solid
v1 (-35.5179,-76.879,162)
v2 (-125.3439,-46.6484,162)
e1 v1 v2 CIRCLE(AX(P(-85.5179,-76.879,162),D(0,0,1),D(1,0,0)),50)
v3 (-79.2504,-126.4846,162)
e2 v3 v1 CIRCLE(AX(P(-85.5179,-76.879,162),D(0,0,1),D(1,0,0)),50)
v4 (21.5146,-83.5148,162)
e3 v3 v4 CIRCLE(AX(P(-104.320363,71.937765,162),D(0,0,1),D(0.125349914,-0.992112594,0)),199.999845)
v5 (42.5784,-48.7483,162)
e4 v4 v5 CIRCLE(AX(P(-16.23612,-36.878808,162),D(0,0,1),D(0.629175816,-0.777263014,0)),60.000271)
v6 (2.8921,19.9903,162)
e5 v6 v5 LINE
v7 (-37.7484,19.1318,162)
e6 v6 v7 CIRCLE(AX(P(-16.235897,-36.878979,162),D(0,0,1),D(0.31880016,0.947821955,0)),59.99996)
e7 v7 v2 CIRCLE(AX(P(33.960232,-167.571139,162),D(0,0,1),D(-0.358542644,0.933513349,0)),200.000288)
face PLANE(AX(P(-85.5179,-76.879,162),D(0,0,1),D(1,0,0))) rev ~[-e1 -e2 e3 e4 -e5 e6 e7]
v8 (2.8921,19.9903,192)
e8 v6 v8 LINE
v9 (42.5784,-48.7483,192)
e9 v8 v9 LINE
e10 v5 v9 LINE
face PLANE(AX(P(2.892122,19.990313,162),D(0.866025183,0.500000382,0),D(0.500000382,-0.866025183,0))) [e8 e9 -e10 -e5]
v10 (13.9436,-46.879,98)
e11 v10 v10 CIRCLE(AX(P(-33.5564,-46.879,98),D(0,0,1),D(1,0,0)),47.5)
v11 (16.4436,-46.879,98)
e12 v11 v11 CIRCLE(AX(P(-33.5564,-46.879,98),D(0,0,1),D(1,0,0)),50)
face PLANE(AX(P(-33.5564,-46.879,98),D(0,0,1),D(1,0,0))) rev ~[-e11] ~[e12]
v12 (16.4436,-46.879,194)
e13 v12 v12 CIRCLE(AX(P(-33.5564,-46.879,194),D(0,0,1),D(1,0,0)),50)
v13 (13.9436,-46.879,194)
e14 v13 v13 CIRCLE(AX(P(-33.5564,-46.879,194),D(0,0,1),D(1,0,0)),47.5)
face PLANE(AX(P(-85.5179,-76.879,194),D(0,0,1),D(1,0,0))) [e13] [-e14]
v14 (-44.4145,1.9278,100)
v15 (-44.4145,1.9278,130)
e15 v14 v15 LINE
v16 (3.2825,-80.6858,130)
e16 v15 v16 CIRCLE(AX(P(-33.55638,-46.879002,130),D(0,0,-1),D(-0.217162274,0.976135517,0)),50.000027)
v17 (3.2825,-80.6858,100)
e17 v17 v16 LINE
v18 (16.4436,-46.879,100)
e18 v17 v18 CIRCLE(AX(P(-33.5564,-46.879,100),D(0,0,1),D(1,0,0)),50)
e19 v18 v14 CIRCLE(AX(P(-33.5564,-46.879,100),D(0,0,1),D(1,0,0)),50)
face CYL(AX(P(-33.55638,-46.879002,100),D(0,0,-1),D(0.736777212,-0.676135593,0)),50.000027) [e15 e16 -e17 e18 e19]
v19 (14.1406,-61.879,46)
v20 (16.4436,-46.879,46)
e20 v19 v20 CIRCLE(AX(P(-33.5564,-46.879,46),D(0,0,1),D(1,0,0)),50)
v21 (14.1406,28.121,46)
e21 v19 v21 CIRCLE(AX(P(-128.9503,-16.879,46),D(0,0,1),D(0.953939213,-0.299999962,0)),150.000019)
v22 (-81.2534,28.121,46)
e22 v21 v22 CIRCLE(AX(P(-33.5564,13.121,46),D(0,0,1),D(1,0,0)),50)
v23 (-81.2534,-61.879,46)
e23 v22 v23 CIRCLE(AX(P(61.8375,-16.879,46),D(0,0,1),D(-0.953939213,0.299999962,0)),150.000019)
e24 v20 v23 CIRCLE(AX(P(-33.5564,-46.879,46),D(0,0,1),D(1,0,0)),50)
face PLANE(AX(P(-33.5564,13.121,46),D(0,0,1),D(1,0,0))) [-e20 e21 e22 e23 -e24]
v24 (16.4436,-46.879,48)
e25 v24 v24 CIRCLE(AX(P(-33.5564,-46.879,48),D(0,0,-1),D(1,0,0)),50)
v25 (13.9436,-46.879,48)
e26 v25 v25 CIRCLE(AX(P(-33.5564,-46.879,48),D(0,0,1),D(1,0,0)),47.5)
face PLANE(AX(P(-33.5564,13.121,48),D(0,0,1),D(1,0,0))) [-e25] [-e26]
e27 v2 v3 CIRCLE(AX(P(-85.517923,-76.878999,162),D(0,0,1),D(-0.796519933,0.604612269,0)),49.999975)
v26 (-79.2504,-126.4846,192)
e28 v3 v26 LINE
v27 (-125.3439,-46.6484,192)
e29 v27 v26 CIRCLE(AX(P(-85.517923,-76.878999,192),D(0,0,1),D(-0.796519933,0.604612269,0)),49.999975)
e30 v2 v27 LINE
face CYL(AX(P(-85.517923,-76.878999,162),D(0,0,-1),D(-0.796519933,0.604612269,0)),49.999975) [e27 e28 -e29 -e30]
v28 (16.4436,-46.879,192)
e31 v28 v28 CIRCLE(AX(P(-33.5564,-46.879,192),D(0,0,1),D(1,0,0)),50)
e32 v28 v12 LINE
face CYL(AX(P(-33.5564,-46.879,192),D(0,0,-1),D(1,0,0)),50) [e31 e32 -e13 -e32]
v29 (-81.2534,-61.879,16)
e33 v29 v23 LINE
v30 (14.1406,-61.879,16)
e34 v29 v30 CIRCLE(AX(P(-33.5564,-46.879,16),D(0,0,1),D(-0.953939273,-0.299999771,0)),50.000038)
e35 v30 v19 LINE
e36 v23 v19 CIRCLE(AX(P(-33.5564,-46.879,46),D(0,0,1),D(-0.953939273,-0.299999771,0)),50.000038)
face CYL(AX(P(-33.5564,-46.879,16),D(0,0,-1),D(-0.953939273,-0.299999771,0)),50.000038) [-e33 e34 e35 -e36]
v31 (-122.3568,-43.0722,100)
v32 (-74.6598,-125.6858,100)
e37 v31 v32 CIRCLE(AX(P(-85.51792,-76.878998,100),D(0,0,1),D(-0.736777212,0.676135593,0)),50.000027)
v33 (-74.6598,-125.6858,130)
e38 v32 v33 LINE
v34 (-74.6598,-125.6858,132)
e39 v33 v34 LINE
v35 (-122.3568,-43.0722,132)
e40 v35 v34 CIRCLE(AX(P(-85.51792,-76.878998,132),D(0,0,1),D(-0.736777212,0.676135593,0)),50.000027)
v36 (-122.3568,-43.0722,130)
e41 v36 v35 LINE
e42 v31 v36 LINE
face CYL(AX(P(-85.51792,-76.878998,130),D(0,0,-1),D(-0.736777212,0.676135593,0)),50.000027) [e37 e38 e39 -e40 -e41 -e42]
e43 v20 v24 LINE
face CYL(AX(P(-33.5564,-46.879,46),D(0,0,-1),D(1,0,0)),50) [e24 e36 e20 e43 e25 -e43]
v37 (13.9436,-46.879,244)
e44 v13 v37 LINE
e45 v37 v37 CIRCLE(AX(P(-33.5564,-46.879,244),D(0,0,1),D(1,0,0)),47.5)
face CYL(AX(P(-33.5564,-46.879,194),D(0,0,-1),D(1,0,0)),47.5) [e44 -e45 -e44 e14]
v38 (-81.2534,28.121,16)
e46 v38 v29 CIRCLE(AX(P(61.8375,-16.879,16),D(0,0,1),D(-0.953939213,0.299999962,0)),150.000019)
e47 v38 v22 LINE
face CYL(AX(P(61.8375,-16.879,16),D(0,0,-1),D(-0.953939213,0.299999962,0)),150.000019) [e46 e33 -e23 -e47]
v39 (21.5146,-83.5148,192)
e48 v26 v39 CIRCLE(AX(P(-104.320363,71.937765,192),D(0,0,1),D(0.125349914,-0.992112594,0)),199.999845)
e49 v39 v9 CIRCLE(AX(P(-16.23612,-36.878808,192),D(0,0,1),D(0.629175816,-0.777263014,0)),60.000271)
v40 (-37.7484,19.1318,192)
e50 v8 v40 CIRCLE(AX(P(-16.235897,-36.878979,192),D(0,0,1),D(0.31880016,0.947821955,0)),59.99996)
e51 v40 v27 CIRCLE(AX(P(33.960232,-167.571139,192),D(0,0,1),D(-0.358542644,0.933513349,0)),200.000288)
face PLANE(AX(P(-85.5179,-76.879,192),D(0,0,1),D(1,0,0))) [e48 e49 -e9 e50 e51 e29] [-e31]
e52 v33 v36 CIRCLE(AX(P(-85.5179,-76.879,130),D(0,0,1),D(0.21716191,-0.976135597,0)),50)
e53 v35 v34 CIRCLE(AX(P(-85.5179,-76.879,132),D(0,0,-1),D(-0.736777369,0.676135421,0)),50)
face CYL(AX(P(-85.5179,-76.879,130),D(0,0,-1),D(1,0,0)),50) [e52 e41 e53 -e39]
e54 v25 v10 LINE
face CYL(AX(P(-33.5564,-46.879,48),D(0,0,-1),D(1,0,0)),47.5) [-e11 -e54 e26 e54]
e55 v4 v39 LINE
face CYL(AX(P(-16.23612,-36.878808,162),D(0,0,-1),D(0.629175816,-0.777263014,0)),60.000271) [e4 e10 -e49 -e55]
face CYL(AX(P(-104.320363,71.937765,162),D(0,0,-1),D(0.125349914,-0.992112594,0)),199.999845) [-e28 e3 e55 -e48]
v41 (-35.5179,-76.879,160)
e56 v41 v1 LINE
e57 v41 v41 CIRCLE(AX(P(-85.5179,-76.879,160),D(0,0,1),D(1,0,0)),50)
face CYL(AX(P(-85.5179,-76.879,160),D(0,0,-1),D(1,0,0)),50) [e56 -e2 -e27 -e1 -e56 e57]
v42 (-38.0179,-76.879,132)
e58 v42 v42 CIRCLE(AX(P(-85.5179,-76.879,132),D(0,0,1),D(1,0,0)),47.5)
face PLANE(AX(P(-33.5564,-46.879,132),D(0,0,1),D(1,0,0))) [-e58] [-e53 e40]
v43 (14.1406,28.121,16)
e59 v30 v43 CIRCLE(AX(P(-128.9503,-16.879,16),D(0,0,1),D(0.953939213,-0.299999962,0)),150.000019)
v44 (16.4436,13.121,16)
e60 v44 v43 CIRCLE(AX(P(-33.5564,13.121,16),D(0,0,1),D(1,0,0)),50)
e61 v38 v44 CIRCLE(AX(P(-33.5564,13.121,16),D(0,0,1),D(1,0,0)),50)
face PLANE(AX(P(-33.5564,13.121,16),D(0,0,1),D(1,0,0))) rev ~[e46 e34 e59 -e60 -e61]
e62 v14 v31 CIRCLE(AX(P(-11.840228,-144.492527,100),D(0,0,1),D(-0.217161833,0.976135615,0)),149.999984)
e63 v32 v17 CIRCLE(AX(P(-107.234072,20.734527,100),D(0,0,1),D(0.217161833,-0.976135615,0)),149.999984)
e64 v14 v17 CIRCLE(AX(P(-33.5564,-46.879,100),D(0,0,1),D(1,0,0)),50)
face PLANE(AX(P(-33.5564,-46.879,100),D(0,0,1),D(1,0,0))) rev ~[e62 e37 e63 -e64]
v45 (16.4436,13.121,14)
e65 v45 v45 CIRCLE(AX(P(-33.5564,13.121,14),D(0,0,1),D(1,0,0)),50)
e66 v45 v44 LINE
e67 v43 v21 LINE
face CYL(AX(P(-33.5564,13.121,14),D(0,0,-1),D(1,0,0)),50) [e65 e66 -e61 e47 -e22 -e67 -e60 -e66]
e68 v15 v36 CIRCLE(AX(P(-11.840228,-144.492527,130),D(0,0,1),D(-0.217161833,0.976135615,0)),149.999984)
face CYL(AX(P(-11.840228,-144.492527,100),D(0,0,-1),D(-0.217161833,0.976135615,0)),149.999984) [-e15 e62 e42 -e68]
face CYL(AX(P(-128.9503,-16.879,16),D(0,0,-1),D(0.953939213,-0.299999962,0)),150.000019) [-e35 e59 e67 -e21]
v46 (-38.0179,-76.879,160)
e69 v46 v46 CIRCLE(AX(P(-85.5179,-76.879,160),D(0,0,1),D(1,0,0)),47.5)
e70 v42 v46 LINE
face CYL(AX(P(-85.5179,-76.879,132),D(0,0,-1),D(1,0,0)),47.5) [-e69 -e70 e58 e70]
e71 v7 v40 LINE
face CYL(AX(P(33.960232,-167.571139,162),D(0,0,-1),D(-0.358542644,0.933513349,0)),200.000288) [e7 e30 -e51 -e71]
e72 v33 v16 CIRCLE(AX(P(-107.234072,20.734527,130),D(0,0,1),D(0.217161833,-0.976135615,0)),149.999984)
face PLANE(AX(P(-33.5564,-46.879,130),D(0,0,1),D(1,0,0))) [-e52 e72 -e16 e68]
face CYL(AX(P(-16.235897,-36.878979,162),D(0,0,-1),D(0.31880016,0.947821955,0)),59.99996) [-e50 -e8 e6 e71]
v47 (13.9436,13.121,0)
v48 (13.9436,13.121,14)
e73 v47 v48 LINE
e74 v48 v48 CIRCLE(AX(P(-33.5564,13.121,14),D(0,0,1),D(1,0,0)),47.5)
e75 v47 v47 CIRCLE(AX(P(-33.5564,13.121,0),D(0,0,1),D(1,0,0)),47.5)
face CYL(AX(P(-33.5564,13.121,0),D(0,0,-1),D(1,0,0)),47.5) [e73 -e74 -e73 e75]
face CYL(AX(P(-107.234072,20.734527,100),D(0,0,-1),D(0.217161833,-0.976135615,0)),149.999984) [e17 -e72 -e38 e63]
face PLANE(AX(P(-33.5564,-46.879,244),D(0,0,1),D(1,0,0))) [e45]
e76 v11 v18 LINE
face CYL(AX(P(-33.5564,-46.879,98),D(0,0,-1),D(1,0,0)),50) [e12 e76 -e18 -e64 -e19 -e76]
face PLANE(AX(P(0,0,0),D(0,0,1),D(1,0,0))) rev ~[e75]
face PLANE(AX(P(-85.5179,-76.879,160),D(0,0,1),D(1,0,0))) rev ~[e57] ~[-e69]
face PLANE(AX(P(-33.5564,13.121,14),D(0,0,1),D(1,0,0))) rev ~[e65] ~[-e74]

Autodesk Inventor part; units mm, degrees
ref_plane "YZ Plane" through (0, 0, 0) normal (1, 0, 0) x (0, 1, 0)
ref_plane "XZ Plane" through (0, 0, 0) normal (0, 1, 0) x (-1, 0, 0)
ref_plane "XY Plane" through (0, 0, 0) normal (0, 0, 1) x (1, 0, 0)
sketch "Sketch8" plane through (0, 0, 0) normal (0, 0, 1) x (1, 0, 0)
  circle A0 centre (-33.5564, 13.121) radius 47.5
  point P0 (0, 0)
  dimension "d28" = 95
extrude "Extrusion6" add sketch "Sketch8" along normal blind 14
sketch "Sketch9" plane through (-33.5564, 13.121, 14) normal (0, 0, 1) x (1, 0, 0)
  circle A0 centre (0, 0) radius 50
  point P0 (33.5564, -13.121)
  dimension "d31" = 100
extrude "Extrusion7" add sketch "Sketch9" along normal blind 2
sketch "Sketch10" plane through (-33.5564, 13.121, 16) normal (0, 0, 1) x (1, 0, 0)
  circle A0 centre (0, 0) radius 50 projected
  arc A1 (-47.697, -75) -> (47.697, -75) centre (0, -60) ccw
  arc A2 (47.697, 15) -> (-47.697, 15) centre (0, 0) ccw
  line L0 (-61.4591, 15) -> (62.8598, 15) construction
  arc A3 (47.697, -75) -> (47.697, 15) centre (-95.3939, -30) ccw
  line L1 (0, 0) -> (0, -112.0986) construction
  arc A4 (-47.697, 15) -> (-47.697, -75) centre (95.3939, -30) ccw
  point P0 (33.5564, -13.121)
  point P1 (47.697, 15)
  point P2 (-47.697, 15)
  dimension "d34" = 100
  dimension "d35" = 60
  dimension "d37" = 100
  dimension "d38" = 150
extrude "Extrusion8" add sketch "Sketch10" along normal blind 30
sketch "Sketch15" plane through (-33.5564, 13.121, 46) normal (0, 0, 1) x (1, 0, 0)
  circle A0 centre (0, 0) radius 47.5 projected
  circle A1 centre (0, 0) radius 47.5 projected
  line L0 (0, 0) -> (0, -60)
  circle A2 centre (0, -60) radius 50
  point P0 (33.5564, -13.121)
  dimension "d61" = 60
  dimension "d62" = 100
extrude "Extrusion13" add sketch "Sketch15" along normal blind 2 contours A2 L0 A0 | A0 A2 | A0 L0 A2 picked at (-1.9859, -88.9539)
sketch "Sketch16" plane through (-33.5564, -46.879, 48) normal (0, 0, 1) x (1, 0, 0)
  circle A0 centre (0, 0) radius 47.5
  point P0 (33.5564, 46.879)
  dimension "d65" = 95
extrude "Extrusion14" add sketch "Sketch16" along normal blind 50
sketch "Sketch22" plane through (-33.5564, -46.879, 98) normal (0, 0, 1) x (1, 0, 0)
  circle A0 centre (0, 0) radius 50
  point P0 (33.5564, 46.879)
  dimension "d92" = 100
extrude "Extrusion20" add sketch "Sketch22" along normal blind 2
sketch "Sketch23" plane through (-33.5564, -46.879, 100) normal (0, 0, 1) x (1, 0, 0)
  line L0 (0, 0) -> (0, 136.4462) construction
  line L1 (0, 0) -> (-102.7311, -59.3118) construction
  line L2 (0, 0) -> (-51.9615, -30) construction
  arc A0 (-88.8004, 3.8068) -> (-41.1034, -78.8068) centre (-51.9615, -30) ccw
  arc A1 (-10.8581, 48.8068) -> (-88.8004, 3.8068) centre (21.7162, -97.6136) ccw
  arc A2 (-41.1034, -78.8068) -> (36.8389, -33.8068) centre (-73.6777, 67.6136) ccw
  arc A3 (36.8389, -33.8068) -> (-10.8581, 48.8068) centre (0, 0) ccw
  circle A4 centre (0, 0) radius 50 projected
  point P0 (33.5564, 46.879)
  dimension "d95" = 120
  dimension "d96" = 60
  dimension "d101" = 150
extrude "Extrusion21" add sketch "Sketch23" along normal blind 30
sketch "Sketch31" plane through (-33.5564, -46.879, 130) normal (0, 0, 1) x (1, 0, 0)
  arc A0 (-88.8004, 3.8068) -> (-41.1034, -78.8068) centre (-51.9615, -30) ccw projected
  circle A1 centre (-51.9615, -30) radius 50
  point P0 (33.5564, 46.879)
  point P1 (-41.1034, -78.8068)
  point P2 (-88.8004, 3.8068)
  dimension "d144" = 100
extrude "Extrusion29" add sketch "Sketch31" along normal blind 2
sketch "Sketch32" plane through (-85.5179, -76.879, 132) normal (0, 0, 1) x (1, 0, 0)
  circle A0 centre (0, 0) radius 47.5
  point P0 (85.5179, 76.879)
  dimension "d147" = 95
extrude "Extrusion30" add sketch "Sketch32" along normal blind 28
sketch "Sketch33" plane through (-85.5179, -76.879, 160) normal (0, 0, 1) x (1, 0, 0)
  circle A0 centre (0, 0) radius 50
  point P0 (85.5179, 76.879)
  dimension "d150" = 100
extrude "Extrusion31" add sketch "Sketch33" along normal blind 2
sketch "Sketch34" plane through (-85.5179, -76.879, 162) normal (0, 0, 1) x (1, 0, 0)
  line L0 (0, 0) -> (134.2711, 77.5215) construction
  line L1 (0, 0) -> (155.0429, 0) construction
  line L2 (0, 0) -> (69.282, 40) construction
  arc A0 (-39.826, 30.2306) -> (6.2675, -49.6056) centre (0, 0) ccw
  line L3 (73.1921, 123.2275) -> (151.6531, -12.6708)
  arc A1 (47.7695, 96.0108) -> (-39.826, 30.2306) centre (119.478, -90.6919) ccw
  circle A2 centre (0, 0) radius 50 projected
  arc A3 (107.0325, -6.6358) -> (128.0963, 28.1307) centre (69.282, 40) ccw
  arc A4 (88.41, 96.8693) -> (47.7695, 96.0108) centre (69.282, 40) ccw
  arc A5 (6.2675, -49.6056) -> (107.0325, -6.6358) centre (-18.8025, 148.8169) ccw
  point P0 (85.5179, 76.879)
  dimension "d153" = 30
  dimension "d155" = 80
  dimension "d158" = 125
  dimension "d159" = 60
  dimension "d160" = 200
extrude "Extrusion32" add sketch "Sketch34" along normal blind 30
sketch "Sketch35" plane through (-85.5179, -76.879, 192) normal (0, 0, 1) x (1, 0, 0)
  circle A0 centre (51.9615, 30) radius 47.5 projected
  circle A1 centre (51.9615, 30) radius 50
  point P0 (85.5179, 76.879)
  dimension "d163" = 100
extrude "Extrusion33" add sketch "Sketch35" along normal blind 2 contours A0 | A1
sketch "Sketch36" plane through (-33.5564, -46.879, 194) normal (0, 0, 1) x (1, 0, 0)
  circle A0 centre (0, 0) radius 47.5
  point P0 (33.5564, 46.879)
  dimension "d166" = 95
extrude "Extrusion34" add sketch "Sketch36" along normal blind 50
properties part number "Malec Klika_ok"
